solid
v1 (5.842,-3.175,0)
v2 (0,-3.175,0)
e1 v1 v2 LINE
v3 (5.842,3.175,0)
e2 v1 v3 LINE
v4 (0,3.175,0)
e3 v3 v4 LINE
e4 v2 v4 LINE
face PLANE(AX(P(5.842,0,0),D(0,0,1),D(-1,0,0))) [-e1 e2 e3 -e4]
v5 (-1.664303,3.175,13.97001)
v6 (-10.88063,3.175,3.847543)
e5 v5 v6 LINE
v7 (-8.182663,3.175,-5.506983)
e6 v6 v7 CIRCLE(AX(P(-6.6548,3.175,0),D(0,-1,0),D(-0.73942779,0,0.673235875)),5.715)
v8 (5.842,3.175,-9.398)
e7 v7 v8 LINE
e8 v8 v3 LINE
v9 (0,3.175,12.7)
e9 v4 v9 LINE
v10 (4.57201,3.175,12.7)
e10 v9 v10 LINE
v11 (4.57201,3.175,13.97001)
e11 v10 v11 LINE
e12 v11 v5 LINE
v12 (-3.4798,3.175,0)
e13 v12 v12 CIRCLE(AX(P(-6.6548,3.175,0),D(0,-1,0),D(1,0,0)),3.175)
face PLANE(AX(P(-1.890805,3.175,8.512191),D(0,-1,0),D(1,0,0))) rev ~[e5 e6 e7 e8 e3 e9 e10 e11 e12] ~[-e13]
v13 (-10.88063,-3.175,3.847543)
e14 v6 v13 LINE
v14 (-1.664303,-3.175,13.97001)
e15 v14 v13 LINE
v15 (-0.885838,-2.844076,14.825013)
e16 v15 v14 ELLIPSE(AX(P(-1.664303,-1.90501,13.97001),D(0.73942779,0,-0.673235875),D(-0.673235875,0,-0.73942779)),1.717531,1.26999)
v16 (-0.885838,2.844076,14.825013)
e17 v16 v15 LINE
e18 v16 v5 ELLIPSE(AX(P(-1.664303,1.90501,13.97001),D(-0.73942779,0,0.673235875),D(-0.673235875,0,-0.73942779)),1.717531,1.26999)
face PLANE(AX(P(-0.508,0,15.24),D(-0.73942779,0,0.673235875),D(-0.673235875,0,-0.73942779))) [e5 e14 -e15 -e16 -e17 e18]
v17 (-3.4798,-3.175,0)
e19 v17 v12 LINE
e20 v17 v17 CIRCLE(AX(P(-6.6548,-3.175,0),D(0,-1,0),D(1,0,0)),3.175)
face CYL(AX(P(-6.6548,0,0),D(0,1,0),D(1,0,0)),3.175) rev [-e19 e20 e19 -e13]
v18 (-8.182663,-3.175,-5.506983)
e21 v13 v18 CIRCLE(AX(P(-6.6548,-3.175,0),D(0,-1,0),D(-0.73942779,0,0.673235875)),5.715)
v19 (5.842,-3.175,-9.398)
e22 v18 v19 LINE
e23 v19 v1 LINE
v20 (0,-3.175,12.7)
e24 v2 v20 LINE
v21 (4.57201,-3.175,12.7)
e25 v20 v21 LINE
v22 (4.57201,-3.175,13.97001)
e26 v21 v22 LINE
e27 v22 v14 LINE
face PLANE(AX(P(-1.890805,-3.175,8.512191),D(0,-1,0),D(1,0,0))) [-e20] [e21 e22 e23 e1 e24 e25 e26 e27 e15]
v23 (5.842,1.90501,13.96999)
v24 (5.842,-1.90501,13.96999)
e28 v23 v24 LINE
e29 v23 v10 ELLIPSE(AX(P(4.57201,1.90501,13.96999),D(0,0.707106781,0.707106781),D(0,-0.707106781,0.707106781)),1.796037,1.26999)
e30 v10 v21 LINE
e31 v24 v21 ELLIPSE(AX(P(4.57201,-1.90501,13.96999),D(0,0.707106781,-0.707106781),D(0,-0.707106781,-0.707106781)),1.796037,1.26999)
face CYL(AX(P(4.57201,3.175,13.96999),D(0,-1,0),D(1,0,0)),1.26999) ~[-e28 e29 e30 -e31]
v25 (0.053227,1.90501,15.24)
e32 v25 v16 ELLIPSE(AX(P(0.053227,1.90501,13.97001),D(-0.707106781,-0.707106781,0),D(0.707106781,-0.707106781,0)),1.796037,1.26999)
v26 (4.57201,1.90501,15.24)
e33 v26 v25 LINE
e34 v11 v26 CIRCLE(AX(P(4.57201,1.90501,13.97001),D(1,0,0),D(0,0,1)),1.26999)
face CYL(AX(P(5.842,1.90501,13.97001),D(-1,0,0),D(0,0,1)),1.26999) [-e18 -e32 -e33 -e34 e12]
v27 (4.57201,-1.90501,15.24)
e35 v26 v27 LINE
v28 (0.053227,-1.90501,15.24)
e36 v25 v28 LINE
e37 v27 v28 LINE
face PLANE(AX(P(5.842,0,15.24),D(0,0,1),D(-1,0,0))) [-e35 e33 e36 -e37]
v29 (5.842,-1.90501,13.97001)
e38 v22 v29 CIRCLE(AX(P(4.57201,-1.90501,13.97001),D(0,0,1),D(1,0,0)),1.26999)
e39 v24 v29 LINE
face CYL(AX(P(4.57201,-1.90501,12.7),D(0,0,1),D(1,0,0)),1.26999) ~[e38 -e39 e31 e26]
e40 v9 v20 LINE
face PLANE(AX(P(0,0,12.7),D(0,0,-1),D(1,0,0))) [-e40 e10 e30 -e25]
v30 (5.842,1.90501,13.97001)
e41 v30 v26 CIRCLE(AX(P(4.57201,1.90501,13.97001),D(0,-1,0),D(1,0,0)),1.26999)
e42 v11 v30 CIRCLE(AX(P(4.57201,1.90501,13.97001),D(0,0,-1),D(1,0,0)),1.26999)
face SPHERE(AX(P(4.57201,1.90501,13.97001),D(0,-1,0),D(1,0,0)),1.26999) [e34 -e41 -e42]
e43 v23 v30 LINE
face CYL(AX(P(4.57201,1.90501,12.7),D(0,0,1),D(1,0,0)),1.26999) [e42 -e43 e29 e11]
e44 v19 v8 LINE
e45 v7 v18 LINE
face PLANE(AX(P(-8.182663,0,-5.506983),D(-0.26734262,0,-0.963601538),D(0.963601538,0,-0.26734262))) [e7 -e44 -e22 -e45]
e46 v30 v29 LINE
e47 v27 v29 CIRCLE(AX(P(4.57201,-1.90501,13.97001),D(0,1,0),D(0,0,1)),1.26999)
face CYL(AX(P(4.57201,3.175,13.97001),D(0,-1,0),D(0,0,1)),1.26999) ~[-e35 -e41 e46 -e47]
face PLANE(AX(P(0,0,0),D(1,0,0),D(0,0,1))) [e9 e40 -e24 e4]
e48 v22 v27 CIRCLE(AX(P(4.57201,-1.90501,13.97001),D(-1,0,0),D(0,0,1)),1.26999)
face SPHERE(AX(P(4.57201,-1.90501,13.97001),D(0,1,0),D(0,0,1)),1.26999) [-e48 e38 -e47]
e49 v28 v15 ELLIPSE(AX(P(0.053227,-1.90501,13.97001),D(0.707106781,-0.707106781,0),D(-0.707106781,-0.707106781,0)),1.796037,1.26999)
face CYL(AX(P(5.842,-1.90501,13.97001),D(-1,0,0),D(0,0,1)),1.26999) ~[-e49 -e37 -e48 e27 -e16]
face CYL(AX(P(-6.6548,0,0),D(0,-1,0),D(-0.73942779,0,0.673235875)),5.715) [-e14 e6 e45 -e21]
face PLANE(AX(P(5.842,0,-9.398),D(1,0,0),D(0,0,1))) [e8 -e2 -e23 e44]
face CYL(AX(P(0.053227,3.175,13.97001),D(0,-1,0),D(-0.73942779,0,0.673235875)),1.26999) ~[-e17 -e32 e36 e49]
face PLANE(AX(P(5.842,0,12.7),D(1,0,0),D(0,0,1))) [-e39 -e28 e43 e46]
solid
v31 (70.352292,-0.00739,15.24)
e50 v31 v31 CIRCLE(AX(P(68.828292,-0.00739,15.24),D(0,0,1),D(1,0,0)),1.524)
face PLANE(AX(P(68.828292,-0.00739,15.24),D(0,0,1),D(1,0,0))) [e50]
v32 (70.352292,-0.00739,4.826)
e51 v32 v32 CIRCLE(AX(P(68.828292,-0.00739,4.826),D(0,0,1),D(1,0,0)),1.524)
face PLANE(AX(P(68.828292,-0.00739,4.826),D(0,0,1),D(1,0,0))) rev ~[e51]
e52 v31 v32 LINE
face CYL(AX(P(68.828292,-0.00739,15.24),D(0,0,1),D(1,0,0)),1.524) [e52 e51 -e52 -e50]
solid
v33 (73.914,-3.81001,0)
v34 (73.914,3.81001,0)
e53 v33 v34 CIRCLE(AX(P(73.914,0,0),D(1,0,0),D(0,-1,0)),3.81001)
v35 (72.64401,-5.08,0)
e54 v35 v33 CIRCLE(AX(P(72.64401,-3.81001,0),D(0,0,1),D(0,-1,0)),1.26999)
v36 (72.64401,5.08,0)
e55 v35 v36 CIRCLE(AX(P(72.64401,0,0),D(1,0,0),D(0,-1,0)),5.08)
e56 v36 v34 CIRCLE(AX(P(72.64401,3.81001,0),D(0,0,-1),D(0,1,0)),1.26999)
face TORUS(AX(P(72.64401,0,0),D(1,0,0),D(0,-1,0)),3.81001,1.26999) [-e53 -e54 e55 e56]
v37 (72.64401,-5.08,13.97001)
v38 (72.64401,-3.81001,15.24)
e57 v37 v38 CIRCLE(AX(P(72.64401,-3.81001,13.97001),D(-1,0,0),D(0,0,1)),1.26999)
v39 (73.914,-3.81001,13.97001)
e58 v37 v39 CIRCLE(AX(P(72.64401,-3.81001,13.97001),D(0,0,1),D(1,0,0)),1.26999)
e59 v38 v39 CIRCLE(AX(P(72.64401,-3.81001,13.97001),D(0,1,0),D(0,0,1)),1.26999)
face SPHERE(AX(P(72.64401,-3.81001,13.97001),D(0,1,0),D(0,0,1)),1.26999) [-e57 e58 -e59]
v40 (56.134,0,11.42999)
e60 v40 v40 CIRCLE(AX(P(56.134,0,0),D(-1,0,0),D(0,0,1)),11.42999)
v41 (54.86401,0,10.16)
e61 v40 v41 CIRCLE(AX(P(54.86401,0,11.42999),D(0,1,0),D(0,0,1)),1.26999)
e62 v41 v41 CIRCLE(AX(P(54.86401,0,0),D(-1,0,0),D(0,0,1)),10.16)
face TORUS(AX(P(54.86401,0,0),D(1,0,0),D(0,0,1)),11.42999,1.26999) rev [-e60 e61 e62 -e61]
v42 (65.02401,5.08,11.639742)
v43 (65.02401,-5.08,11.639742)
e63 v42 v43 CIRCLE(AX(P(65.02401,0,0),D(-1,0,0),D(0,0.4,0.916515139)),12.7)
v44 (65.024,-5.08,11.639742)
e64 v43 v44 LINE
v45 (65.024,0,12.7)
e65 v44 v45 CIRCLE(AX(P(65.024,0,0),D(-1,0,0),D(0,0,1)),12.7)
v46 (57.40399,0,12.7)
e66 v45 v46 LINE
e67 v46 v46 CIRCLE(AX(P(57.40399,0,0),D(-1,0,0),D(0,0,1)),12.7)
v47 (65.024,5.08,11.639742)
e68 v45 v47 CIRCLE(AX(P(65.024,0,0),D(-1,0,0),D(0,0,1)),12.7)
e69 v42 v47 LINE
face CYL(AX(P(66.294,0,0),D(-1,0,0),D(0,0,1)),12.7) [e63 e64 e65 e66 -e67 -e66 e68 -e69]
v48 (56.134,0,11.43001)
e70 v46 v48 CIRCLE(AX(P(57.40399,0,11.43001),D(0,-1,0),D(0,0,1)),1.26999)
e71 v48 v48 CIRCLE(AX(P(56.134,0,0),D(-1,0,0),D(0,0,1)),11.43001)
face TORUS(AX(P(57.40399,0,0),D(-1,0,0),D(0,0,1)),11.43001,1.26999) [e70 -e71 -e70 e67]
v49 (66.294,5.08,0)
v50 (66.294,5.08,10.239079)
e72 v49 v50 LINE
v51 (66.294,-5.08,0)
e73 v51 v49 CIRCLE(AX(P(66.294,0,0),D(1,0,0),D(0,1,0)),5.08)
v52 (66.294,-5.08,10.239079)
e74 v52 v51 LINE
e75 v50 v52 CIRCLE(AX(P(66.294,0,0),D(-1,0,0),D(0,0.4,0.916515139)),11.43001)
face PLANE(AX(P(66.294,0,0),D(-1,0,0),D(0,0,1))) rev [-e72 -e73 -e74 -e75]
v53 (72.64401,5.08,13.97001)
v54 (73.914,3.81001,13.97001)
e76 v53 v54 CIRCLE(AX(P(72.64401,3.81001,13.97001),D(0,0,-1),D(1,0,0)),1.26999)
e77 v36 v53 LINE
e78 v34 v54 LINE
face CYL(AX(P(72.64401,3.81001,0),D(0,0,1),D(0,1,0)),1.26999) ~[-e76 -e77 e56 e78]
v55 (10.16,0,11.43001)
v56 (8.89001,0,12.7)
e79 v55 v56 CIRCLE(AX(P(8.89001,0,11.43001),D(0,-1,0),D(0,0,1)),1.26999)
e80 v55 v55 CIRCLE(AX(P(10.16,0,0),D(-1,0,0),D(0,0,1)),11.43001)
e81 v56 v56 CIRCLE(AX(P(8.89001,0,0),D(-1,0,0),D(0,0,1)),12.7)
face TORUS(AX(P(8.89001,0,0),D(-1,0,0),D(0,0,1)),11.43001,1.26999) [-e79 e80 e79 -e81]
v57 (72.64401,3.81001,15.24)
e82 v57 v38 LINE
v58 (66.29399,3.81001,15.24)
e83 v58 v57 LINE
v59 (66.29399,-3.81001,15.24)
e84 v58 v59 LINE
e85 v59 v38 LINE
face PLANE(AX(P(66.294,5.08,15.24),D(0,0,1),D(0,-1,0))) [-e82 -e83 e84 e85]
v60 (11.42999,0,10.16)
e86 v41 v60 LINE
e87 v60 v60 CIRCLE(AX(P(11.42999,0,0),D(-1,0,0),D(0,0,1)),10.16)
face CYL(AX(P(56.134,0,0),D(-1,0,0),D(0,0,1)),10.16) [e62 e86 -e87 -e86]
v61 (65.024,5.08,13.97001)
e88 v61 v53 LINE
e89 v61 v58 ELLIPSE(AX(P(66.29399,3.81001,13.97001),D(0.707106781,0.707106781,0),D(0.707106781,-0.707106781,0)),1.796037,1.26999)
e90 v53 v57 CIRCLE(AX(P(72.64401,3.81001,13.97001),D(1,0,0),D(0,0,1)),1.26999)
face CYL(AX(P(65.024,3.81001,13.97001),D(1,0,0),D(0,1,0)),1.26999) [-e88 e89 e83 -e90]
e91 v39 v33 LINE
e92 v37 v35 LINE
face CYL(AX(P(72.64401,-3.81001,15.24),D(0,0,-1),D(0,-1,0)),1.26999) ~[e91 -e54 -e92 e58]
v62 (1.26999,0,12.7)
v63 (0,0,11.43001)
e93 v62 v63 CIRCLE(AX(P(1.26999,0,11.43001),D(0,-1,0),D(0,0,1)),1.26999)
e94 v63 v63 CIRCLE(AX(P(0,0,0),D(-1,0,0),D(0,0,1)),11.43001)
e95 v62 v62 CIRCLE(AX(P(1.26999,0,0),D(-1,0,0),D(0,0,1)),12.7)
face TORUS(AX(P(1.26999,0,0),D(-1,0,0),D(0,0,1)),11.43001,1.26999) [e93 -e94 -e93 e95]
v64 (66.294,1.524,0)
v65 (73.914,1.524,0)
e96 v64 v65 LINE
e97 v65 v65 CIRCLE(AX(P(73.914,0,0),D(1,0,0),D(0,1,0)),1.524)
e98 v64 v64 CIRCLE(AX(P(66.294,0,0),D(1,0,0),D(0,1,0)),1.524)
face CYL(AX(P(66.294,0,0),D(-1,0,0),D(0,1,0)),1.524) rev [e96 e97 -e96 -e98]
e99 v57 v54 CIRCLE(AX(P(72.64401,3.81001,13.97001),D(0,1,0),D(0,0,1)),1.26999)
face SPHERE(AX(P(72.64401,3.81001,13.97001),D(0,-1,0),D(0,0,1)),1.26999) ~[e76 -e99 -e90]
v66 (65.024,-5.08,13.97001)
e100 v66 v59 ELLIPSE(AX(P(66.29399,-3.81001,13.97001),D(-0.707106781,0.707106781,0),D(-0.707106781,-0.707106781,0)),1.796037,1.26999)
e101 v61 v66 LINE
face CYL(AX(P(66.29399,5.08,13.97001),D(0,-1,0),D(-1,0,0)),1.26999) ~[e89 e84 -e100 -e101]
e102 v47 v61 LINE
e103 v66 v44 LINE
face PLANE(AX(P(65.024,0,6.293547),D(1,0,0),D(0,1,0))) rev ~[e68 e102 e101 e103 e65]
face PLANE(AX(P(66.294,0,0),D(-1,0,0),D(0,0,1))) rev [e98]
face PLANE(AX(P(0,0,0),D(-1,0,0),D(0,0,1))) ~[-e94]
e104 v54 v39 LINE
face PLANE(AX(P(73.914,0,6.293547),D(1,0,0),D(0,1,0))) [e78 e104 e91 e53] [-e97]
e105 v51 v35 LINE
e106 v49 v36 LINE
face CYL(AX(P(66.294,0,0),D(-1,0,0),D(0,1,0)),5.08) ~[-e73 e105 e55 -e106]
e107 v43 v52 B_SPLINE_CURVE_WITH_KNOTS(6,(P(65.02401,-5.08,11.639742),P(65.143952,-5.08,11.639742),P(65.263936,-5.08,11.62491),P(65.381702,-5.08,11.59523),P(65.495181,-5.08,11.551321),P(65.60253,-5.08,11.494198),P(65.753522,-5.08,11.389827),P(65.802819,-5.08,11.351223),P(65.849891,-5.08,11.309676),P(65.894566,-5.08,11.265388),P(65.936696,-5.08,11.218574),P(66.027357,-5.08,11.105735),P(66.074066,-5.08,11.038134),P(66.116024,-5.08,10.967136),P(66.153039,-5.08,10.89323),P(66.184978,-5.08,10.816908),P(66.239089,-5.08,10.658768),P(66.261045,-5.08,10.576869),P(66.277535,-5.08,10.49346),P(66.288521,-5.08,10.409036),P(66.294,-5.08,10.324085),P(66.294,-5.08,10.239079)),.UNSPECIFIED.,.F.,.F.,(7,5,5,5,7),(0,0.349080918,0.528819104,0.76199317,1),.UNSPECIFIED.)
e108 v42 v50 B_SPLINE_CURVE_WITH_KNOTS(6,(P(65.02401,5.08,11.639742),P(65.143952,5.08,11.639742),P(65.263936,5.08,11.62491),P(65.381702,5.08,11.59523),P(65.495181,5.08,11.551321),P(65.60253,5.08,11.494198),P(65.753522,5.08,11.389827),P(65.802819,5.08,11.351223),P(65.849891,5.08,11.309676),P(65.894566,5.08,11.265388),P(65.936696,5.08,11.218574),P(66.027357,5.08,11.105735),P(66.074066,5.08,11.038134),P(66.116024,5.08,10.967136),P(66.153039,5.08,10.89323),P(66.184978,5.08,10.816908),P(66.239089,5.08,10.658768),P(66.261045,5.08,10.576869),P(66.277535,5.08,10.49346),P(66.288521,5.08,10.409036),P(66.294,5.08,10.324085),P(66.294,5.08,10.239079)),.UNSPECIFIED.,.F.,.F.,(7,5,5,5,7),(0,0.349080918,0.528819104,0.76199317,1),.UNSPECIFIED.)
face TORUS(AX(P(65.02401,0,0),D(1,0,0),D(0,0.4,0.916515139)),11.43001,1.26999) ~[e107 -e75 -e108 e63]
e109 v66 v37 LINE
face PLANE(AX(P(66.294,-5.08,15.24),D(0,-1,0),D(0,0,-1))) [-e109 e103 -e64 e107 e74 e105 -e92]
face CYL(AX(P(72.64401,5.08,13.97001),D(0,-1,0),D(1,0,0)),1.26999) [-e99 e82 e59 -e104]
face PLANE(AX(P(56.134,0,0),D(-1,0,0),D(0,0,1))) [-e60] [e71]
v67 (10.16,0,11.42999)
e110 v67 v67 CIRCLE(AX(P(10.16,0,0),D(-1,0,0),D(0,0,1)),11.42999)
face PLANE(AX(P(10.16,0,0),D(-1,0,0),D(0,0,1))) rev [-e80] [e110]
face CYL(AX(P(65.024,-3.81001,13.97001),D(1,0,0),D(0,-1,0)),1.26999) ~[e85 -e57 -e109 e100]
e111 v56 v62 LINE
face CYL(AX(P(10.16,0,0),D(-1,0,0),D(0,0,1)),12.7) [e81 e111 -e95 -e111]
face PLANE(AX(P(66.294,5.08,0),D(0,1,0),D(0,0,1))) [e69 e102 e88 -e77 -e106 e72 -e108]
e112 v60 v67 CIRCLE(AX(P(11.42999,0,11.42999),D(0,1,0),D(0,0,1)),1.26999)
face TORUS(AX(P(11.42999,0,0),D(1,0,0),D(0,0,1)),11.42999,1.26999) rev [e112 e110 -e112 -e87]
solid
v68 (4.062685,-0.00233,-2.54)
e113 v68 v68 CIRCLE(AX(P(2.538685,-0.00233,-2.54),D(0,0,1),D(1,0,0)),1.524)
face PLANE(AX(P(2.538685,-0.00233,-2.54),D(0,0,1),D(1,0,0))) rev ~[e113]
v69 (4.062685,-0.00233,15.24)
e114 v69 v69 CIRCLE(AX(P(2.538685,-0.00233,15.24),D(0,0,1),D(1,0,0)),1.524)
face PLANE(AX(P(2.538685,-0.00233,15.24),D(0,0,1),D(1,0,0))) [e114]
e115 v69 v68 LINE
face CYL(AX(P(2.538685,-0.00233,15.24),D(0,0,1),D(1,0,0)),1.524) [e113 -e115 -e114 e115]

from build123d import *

# Parameters (mm, degrees)
F0_W          = 5.842
F0_H          = 12.7
F0_R          = 3.175
F2_DEPTH      = 3.175
F3_R          = 1.524
F4_DEPTH      = 7.62
F4_DEPTH_BACK = 1.27
F5_R          = 1.524
F6_DEPTH      = 17.78
F7_R          = 1.524
F8_DEPTH      = 10.414
F9_R          = 1.26999
F9_2_R        = 1.26999


# Not quite as in the source:
# - a fillet or chamfer is up to 0.001 mm smaller than in the source, because OpenCascade refuses the exact size


with BuildPart() as f1:
    # F0 (on Front) → F1 (revolve)
    with BuildSketch(Plane.XZ):
        Polygon((5.842, 12.7), (5.842, 0), (66.294, 0), (66.294, 12.7), (56.134, 12.7), (56.134, 10.16), (10.16, 10.16), (10.16, 12.7), align=None)
        with Locations((2.921, 6.35)):
            Rectangle(F0_W, F0_H)
    revolve(axis=Axis((33.147, 0, 0), (-1, 0, 0)))

    # F3 (on face) → F4 (join, two sides)
    with BuildSketch(Plane.YZ.offset(66.294)) as f4_sk:
        with BuildLine():
            ThreePointArc((-5.08, 0), (0, 5.08), (5.08, 0))
            Line((5.08, 0), (5.08, 11.6397422652))
            ThreePointArc((5.08, 11.6397422652), (0, 12.7), (-5.08, 11.6397422652))
            Line((-5.08, 11.6397422652), (-5.08, 0))
        make_face()
        with BuildLine():
            ThreePointArc((-5.08, 0), (0, -5.08), (5.08, 0))
            ThreePointArc((5.08, 0), (0, 5.08), (-5.08, 0))
        make_face()
        Circle(F3_R, mode=Mode.SUBTRACT)
        with BuildLine():
            ThreePointArc((-5.08, 11.6397422652), (0, 12.7), (5.08, 11.6397422652))
            Line((5.08, 11.6397422652), (5.08, 15.24))
            Line((5.08, 15.24), (-5.08, 15.24))
            Line((-5.08, 15.24), (-5.08, 11.6397422652))
        make_face()
    extrude(amount=F4_DEPTH)
    extrude(f4_sk.sketch, amount=-F4_DEPTH_BACK)

    # F9 (radius 1.27 in the source; OpenCascade refuses exactly that, so slightly less here)
    f9_edges = [f1.edges().sort_by_distance(p)[0] for p in [
        (10.16, 0, -12.7),
        (0, 0, -12.7),
        (10.16, 0, -10.16),
        (56.134, 0, -10.16),
        (33.147, 0, 10.16),
        (73.914, 0, 15.24),
        (69.469, 5.08, 15.24),
        (65.024, 0, 15.24),
        (69.469, -5.08, 15.24),
        (56.134, 0, -12.7),
        (66.294, 0, -12.7),
        (73.914, -5.08, 7.62),
        (73.914, 5.08, 7.62),
        (73.914, 0, -5.08),
    ]]
    fillet(f9_edges, radius=F9_R)


with BuildPart() as f2:
    # F0 (on Front) → F2 (new body, symmetric)
    with BuildSketch(Plane.XZ):
        with BuildLine():
            Line((-0.9398, 0), (0, 0))
            Line((0, 0), (0, 12.7))
            Line((0, 12.7), (5.842, 12.7))
            Line((5.842, 12.7), (5.842, 15.24))
            Line((5.842, 15.24), (-0.508, 15.24))
            Line((-0.508, 15.24), (-10.8806298187, 3.8475430269))
            ThreePointArc((-10.8806298187, 3.8475430269), (-4.5919612295, 5.3297205562), (-0.9398, 0))
        make_face()
        with BuildLine():
            ThreePointArc((-8.1826630726, -5.5069827884), (-3.1957909266, -4.5493385486), (-0.9398, 0))
            ThreePointArc((-0.9398, 0), (-4.5919612295, 5.3297205562), (-10.8806298187, 3.8475430269))
            ThreePointArc((-10.8806298187, 3.8475430269), (-12.1459778134, -1.5837270034), (-8.1826630726, -5.5069827884))
        make_face()
        with Locations((-6.6548, 0)):
            Circle(F0_R, mode=Mode.SUBTRACT)
        with BuildLine():
            Line((5.842, 0), (0, 0))
            Line((0, 0), (-0.9398, 0))
            ThreePointArc((-0.9398, 0), (-3.1957909266, -4.5493385486), (-8.1826630726, -5.5069827884))
            Line((-8.1826630726, -5.5069827884), (5.842, -9.398))
            Line((5.842, -9.398), (5.842, 0))
        make_face()
    extrude(amount=F2_DEPTH, both=True)

    # F9#2 (radius 1.27 in the source; OpenCascade refuses exactly that, so slightly less here)
    f9_2_edges = [f2.edges().sort_by_distance(p)[0] for p in [
        (5.842, 0, 15.24),
        (2.667, -3.175, 15.24),
        (5.842, 0, 12.7),
        (5.842, 3.175, 13.97),
        (5.842, -3.175, 13.97),
        (2.667, 3.175, 15.24),
        (-0.508, 0, 15.24),
    ]]
    fillet(f9_2_edges, radius=F9_2_R)


with BuildPart() as f6:
    # F5 (on face) → F6 (new body)
    with BuildSketch(Plane.XY.offset(15.24)):
        with Locations((2.5386845227, -0.0023302223)):
            Circle(F5_R)
    extrude(amount=-F6_DEPTH)


with BuildPart() as f8:
    # F7 (on face) → F8 (new body)
    with BuildSketch(Plane.XY.offset(15.24)):
        with Locations((68.828292191, -0.007390372)):
            Circle(F7_R)
    extrude(amount=-F8_DEPTH)


solid = Compound([f1.part, f2.part, f6.part, f8.part])
